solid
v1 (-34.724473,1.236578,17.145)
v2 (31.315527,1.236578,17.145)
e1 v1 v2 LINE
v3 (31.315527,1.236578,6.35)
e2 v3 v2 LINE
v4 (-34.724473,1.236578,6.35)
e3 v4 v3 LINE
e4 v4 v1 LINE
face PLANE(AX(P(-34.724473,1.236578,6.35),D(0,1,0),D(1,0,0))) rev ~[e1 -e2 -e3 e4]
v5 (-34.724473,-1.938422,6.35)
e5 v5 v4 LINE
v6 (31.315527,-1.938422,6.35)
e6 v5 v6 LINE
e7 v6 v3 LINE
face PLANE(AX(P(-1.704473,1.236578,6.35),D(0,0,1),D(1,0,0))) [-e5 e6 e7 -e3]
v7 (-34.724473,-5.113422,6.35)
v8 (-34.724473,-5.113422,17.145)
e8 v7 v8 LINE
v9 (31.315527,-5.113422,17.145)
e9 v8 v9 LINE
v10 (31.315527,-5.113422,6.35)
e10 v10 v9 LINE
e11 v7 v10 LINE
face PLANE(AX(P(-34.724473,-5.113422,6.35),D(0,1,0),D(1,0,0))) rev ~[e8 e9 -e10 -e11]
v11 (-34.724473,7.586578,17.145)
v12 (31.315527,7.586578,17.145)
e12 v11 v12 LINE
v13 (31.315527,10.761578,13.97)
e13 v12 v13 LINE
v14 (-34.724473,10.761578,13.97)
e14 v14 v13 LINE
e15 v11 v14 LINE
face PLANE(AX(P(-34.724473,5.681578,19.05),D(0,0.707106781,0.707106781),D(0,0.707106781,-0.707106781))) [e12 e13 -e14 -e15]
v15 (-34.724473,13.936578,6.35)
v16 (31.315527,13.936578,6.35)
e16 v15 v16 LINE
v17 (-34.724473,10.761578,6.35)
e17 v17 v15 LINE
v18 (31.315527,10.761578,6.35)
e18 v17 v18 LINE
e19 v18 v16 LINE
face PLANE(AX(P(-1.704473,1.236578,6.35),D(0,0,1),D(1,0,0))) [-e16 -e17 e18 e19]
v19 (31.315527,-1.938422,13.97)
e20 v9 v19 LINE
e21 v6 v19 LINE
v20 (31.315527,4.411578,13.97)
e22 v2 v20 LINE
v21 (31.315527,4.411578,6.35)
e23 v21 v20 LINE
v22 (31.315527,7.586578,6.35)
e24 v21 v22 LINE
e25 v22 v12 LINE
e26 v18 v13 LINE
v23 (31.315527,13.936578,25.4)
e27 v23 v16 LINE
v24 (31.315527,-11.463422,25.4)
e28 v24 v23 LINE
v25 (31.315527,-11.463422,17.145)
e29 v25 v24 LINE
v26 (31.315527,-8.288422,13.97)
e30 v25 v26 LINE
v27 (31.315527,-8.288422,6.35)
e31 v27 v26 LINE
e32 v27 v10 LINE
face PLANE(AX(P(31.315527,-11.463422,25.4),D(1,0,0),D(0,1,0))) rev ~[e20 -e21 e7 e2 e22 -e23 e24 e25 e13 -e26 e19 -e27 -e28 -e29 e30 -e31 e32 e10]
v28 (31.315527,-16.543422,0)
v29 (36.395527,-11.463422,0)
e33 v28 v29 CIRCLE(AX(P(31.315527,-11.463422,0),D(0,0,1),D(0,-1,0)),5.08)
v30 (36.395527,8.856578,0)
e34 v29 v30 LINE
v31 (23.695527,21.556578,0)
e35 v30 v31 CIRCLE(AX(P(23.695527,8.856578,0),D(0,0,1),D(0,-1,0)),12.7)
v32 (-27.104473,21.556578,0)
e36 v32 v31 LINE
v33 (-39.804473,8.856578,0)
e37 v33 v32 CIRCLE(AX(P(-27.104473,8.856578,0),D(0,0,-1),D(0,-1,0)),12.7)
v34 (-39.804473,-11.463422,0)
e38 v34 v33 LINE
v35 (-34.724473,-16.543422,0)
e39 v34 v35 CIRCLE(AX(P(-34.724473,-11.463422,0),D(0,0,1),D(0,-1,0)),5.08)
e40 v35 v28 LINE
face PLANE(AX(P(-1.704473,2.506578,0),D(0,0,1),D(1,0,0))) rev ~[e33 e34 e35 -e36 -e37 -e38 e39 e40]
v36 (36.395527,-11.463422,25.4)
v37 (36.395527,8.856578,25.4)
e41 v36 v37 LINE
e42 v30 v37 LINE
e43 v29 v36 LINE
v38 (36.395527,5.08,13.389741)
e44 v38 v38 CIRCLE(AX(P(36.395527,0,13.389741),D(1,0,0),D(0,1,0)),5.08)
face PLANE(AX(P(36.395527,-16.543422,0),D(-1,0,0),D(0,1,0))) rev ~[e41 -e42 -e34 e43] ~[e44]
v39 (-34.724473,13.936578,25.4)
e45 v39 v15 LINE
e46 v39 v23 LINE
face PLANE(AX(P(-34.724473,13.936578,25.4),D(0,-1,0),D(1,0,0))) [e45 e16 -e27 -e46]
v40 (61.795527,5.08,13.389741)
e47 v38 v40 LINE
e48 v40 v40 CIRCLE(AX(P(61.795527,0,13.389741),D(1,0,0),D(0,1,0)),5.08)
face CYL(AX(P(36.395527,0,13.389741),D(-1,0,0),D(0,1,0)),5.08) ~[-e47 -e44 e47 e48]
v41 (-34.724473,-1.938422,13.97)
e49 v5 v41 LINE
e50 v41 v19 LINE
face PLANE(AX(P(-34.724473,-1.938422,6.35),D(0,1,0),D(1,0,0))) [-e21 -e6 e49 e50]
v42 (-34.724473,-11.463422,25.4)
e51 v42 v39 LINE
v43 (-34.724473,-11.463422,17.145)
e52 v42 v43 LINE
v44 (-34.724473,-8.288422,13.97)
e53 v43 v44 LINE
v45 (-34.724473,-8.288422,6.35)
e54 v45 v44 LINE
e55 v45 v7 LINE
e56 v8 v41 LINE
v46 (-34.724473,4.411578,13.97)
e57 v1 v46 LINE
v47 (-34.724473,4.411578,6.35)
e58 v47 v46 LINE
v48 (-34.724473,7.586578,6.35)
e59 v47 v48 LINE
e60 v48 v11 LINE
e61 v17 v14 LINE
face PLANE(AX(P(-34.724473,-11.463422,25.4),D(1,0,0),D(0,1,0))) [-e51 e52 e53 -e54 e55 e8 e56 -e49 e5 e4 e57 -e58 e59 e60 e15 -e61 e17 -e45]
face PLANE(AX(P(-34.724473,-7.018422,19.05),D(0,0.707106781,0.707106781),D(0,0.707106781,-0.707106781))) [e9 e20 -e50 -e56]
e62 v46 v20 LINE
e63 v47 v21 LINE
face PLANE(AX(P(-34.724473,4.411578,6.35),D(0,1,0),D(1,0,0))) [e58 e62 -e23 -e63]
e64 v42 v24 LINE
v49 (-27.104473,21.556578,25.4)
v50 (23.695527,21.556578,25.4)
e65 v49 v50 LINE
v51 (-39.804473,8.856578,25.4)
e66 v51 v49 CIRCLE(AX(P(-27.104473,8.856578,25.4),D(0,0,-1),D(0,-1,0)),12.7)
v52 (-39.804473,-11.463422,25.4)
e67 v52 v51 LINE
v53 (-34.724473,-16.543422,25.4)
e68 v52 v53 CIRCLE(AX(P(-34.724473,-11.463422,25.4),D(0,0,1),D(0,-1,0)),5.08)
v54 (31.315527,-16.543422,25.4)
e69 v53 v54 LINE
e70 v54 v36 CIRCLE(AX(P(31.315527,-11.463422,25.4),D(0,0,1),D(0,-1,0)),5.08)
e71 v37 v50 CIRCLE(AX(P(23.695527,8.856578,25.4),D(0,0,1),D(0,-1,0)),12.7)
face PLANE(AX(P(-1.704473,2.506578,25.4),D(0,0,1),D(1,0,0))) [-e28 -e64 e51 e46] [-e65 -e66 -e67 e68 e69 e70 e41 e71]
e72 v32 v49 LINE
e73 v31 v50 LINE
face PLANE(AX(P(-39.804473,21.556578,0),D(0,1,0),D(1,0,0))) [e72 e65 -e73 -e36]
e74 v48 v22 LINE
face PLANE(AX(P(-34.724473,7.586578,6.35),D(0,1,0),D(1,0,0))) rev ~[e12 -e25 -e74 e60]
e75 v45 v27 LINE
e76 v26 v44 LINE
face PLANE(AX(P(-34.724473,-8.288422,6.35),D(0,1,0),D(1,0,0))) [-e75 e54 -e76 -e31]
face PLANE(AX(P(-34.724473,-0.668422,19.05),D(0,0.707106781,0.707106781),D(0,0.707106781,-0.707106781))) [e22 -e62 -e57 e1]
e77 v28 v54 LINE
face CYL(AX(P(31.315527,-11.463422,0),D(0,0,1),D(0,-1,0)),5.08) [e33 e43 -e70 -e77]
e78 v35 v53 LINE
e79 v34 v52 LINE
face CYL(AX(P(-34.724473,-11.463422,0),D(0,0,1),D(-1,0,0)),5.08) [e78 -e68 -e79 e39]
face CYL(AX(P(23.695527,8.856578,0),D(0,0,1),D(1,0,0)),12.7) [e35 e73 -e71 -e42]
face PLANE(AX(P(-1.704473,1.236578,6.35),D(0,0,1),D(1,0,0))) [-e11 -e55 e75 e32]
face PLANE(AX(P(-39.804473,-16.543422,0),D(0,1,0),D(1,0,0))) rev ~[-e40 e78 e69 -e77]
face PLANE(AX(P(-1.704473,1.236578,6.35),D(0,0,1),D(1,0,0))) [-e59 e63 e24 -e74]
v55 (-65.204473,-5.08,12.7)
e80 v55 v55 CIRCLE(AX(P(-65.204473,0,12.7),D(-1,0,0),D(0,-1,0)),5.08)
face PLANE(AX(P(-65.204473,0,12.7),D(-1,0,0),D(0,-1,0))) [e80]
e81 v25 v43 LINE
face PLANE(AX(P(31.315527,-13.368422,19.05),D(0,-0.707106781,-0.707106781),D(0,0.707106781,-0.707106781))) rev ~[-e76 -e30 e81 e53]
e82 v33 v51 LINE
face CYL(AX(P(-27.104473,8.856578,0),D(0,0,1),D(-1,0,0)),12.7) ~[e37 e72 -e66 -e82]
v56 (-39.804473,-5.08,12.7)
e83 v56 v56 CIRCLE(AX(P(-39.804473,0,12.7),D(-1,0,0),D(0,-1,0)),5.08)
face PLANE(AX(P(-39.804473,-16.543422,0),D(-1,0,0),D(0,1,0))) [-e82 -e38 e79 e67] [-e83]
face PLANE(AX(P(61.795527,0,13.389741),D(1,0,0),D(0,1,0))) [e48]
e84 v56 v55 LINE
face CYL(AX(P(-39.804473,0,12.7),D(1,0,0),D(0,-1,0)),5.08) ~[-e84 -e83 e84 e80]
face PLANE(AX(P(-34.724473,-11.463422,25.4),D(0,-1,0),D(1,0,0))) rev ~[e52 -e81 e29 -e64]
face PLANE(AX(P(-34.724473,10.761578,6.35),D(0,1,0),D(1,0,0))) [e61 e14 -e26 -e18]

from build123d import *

# Parameters (mm, degrees)
F0_W         = 76.2
F0_H         = 38.1
F1_DEPTH     = 25.4
F2_R         = 12.7
F3_R         = 5.08
F4_R         = 5.08
F5_DEPTH     = 25.4
F6_R         = 5.08
F7_DEPTH     = 25.4
F8_W         = 66.04
F8_H         = 25.4
F9_DEPTH     = 19.05
F10_W        = 66.04
F10_H        = 3.175
F11_DEPTH    = 12.7
F12_T1_DEPTH = 66.04
F12_T6_DEPTH = 66.04


# Not quite as in the source:
# - a fillet or chamfer that OpenCascade refuses, or shapes differently, is made with other operations: its cross-section is extruded or revolved along the edge and cut away or added


with BuildPart() as f1:
    # F0 (on Top) → F1 (new body)
    with BuildSketch(Plane.XY):
        with Locations((-1.7044725776, 2.5065781057)):
            Rectangle(F0_W, F0_H)
    extrude(amount=F1_DEPTH)

    # F2
    f2_edges = [f1.edges().sort_by_distance(p)[0] for p in [
        (-39.804473, 21.556578, 12.7),
        (36.395527, 21.556578, 12.7),
    ]]
    fillet(f2_edges, radius=F2_R)

    # F3
    f3_edges = [f1.edges().sort_by_distance(p)[0] for p in [
        (-39.804473, -16.543422, 12.7),
        (36.395527, -16.543422, 12.7),
    ]]
    fillet(f3_edges, radius=F3_R)

    # F4 (on face) → F5 (join)
    with BuildSketch(Plane(origin=(-39.8044725776, 0, 0), x_dir=(0, -1, 0), z_dir=(-1, 0, 0))):
        with Locations((0, 12.7)):
            Circle(F4_R)
    extrude(amount=F5_DEPTH)

    # F6 (on face) → F7 (join)
    with BuildSketch(Plane.YZ.offset(36.3955274224)):
        with Locations((0, 13.3897410706)):
            Circle(F6_R)
    extrude(amount=F7_DEPTH)

    # F8 (on face) → F9 (cut)
    with BuildSketch(Plane.XY.offset(25.4)):
        with Locations((-1.7044725776, 1.2365781057)):
            Rectangle(F8_W, F8_H)
    extrude(amount=-F9_DEPTH, mode=Mode.SUBTRACT)

    # F10 (on face) → F11 (join)
    with BuildSketch(Plane.XY.offset(6.35)):
        with Locations((-1.7044725776, 9.1740781057)):
            Rectangle(F10_W, F10_H)
        with Locations((-1.7044725776, 2.8240781057)):
            Rectangle(F10_W, F10_H)
        with Locations((-1.7044725776, -3.5259218943)):
            Rectangle(F10_W, F10_H)
        with Locations((-1.7044725776, -9.8759218943)):
            Rectangle(F10_W, F10_H)
    extrude(amount=F11_DEPTH)

    # F12: chamfer of 5.08 on 4 edges, made by hand

    # F12_s2 → F12_t1 (cut)
    with BuildSketch(Plane.YZ.offset(-34.7244725776)):
        Polygon((5.6815781057, 19.05), (10.7615781057, 13.97), (10.7615781057, 19.05), align=None)
        Polygon((-0.6684218943, 19.05), (4.4115781057, 13.97), (4.4115781057, 19.05), align=None)
        Polygon((-7.0184218943, 19.05), (-1.9384218943, 13.97), (-1.9384218943, 19.05), align=None)
    extrude(amount=F12_T1_DEPTH, mode=Mode.SUBTRACT)


with BuildPart() as f12_tool4:
    # F12_s5 → F12_t6 (new body)
    with BuildSketch(Plane.YZ.offset(31.3155274224)):
        Polygon((-13.3684218943, 19.05), (-8.2884218943, 13.97), (-8.2884218943, 19.05), align=None)
    extrude(amount=-F12_T6_DEPTH)

    split(bisect_by=Plane.XZ.offset(11.4634218943), keep=Keep.BOTTOM)


with BuildPart() as f1_1:
    add(f1.part)

    # F12_t3: cut F12_tool4
    add(f12_tool4.part, mode=Mode.SUBTRACT)


solid = f1_1.part
